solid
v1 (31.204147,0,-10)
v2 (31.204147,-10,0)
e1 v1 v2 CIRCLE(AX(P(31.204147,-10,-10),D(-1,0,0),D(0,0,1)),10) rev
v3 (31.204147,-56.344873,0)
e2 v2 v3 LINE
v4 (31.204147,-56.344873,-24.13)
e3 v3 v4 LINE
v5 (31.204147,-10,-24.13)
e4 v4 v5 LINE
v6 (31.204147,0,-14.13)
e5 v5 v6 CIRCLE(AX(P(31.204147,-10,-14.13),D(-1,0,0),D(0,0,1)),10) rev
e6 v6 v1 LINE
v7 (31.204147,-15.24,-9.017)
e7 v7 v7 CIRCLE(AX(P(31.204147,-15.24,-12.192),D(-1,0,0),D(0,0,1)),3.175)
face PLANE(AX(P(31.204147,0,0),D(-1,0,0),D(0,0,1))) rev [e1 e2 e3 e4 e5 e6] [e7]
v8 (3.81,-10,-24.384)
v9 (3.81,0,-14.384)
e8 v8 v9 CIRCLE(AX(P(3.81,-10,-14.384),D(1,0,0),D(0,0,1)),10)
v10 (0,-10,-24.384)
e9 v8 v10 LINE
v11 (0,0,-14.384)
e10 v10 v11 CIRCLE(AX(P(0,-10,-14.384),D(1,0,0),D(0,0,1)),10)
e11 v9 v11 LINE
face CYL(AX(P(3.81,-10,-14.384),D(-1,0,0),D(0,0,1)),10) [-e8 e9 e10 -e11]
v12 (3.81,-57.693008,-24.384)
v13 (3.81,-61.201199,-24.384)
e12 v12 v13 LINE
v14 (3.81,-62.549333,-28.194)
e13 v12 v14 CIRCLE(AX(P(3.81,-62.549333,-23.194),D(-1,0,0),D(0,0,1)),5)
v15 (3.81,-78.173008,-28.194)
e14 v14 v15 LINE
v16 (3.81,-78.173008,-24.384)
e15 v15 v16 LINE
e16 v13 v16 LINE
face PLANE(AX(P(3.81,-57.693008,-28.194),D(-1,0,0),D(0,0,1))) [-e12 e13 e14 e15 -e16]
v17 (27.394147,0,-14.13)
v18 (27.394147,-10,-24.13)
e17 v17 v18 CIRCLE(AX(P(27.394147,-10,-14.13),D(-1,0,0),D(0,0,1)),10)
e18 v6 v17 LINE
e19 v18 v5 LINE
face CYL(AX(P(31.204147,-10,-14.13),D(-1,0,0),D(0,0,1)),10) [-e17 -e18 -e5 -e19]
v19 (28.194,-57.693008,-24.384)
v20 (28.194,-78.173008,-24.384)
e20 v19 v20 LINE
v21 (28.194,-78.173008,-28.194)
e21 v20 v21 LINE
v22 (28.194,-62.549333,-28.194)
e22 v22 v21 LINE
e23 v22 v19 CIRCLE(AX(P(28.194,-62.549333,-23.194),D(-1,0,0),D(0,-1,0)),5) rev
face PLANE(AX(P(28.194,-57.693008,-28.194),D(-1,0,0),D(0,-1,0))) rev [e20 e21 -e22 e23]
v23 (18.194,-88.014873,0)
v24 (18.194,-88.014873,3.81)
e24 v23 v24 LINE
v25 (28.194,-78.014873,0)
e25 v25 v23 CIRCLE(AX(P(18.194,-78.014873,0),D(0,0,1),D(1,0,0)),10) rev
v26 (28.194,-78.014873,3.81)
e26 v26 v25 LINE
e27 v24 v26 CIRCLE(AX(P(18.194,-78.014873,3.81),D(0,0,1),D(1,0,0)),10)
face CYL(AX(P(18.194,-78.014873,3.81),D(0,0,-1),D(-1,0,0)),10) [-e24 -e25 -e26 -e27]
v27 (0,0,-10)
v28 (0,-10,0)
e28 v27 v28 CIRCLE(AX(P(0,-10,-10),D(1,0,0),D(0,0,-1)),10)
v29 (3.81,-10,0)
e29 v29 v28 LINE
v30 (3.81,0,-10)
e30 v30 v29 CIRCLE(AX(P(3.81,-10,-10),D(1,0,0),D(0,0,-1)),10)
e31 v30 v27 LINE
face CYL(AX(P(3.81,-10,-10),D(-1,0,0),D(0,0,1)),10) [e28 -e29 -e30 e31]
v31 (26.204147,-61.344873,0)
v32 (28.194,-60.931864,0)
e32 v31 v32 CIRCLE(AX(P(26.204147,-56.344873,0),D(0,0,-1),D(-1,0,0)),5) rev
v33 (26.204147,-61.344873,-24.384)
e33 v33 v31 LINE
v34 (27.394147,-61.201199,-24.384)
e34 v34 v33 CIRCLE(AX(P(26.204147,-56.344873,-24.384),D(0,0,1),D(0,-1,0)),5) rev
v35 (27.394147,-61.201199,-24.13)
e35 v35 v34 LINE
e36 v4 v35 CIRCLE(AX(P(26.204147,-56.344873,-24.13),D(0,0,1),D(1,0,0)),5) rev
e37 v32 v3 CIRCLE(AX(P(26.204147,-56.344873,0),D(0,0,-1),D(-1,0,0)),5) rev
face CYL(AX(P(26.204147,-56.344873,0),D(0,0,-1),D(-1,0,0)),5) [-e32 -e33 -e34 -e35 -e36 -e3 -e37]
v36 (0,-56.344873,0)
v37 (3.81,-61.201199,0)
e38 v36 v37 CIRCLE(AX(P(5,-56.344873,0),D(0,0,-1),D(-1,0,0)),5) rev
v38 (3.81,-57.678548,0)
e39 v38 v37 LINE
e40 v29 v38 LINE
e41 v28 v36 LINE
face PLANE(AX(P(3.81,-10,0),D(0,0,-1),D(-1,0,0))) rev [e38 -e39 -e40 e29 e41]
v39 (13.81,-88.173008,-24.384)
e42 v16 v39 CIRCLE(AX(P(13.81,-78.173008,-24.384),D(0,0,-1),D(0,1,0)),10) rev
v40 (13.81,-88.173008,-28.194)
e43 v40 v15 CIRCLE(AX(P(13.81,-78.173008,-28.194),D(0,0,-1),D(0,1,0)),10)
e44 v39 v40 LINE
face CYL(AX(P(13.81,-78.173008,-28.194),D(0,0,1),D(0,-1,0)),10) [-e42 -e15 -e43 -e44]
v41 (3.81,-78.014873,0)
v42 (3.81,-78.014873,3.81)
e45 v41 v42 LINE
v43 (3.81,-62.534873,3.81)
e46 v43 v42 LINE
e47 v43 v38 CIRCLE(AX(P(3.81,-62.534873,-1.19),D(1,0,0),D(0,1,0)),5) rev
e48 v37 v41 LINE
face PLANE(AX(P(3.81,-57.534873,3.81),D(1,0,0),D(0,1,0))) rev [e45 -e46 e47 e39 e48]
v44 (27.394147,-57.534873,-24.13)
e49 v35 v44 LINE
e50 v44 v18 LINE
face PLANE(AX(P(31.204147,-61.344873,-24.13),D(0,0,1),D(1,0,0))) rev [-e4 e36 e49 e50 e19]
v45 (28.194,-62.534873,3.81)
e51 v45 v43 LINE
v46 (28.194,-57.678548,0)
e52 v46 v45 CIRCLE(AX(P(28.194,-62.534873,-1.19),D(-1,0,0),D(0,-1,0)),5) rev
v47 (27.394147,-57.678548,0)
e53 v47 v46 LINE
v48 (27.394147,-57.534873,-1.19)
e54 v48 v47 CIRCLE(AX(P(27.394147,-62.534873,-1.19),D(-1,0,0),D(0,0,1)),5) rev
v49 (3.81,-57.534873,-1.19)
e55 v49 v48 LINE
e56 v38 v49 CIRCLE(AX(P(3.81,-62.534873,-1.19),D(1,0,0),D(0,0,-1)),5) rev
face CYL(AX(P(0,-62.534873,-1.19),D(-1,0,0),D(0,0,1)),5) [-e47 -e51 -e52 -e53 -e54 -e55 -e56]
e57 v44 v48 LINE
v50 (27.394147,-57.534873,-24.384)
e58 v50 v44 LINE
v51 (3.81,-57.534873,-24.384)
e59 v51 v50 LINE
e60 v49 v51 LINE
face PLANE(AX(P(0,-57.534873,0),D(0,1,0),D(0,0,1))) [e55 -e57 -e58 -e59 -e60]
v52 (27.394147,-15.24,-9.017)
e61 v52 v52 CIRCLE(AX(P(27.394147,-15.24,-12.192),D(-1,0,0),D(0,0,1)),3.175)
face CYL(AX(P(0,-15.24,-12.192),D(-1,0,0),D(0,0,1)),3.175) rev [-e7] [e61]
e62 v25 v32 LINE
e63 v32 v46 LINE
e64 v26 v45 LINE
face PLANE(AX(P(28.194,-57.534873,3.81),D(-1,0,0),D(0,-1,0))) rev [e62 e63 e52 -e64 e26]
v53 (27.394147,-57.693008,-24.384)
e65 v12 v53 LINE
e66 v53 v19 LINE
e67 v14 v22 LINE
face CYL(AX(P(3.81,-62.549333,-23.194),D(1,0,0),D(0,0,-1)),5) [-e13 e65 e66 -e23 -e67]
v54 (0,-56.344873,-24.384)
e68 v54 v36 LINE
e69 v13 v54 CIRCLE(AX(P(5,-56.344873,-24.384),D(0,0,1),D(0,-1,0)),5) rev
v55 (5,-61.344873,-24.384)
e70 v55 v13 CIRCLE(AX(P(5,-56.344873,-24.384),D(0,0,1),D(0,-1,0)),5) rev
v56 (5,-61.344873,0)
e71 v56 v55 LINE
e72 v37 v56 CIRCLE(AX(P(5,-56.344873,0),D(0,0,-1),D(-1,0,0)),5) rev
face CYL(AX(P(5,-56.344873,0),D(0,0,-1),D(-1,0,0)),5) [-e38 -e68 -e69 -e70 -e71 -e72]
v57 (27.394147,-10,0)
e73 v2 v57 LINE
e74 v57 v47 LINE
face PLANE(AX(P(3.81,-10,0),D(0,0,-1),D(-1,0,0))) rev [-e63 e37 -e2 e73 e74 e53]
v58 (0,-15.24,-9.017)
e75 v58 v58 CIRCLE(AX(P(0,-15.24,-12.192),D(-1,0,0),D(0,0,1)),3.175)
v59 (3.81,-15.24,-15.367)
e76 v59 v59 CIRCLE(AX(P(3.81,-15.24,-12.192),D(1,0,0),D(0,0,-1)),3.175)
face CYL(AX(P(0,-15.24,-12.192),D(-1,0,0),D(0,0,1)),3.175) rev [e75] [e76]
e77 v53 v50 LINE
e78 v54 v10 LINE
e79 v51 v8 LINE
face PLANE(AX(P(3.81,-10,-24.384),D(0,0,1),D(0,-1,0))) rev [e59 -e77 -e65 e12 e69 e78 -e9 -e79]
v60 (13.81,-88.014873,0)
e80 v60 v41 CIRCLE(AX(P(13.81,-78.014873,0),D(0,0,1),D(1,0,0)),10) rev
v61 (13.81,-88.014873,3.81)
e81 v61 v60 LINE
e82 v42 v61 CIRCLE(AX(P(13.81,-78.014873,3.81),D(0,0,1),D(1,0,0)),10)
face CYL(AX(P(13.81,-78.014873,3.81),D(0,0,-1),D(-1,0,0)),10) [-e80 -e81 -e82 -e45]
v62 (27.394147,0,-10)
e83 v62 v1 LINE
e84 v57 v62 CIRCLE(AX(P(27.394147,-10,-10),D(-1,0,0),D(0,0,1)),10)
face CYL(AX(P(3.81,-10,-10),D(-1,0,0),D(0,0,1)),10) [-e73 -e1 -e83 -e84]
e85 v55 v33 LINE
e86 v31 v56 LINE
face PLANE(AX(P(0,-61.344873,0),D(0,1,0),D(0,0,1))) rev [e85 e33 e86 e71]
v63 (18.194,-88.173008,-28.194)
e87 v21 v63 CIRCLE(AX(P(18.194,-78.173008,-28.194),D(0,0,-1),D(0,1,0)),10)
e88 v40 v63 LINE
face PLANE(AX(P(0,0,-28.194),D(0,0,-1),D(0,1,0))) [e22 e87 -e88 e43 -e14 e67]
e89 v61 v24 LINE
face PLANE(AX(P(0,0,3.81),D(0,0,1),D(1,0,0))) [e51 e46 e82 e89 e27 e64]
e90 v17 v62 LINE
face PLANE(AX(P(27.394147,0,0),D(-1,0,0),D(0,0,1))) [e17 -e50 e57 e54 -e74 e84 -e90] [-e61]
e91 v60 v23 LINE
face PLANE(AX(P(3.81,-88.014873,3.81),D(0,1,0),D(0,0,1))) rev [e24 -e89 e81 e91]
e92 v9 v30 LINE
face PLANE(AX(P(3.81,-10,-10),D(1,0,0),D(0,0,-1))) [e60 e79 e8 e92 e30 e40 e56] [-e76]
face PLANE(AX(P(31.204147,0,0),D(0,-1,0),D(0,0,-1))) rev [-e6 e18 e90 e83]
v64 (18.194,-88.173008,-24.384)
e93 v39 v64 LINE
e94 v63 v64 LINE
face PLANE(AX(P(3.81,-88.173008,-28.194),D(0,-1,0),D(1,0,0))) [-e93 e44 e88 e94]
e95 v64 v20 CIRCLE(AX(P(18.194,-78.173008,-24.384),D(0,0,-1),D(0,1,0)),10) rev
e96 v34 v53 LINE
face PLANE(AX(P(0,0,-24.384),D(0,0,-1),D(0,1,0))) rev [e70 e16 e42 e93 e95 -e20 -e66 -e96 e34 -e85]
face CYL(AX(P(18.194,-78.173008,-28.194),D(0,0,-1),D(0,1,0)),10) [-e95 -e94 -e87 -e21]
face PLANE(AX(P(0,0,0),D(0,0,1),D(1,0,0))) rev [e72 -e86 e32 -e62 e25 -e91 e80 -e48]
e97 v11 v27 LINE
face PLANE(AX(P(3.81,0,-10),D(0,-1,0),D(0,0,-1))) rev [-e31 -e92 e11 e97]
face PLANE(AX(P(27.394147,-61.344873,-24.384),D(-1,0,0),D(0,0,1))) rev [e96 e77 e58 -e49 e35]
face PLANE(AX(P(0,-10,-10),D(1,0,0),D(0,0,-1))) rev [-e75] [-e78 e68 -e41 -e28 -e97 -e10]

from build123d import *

# Parameters (mm, degrees)
BOSS_EXTRUDE1_DEPTH         = 3.81
SKETCH2_W                   = 27.394147034
SKETCH2_H                   = 24.384
BOSS_EXTRUDE2_DEPTH         = 3.81
SKETCH7_W                   = 24.13
SKETCH7_H                   = 61.344873393
BOSS_EXTRUDE3_DEPTH         = 3.81
FILLET1_R                   = 10
FILLET2_R                   = 10
FILLET3_R                   = 5
FILLET4_R                   = 5
SKETCH8_W                   = 24.384
SKETCH8_H                   = 30.48
BOSS_EXTRUDE4_DEPTH         = 3.81
FILLET5_R                   = 5
FILLET6_R                   = 10
FILLET8_R                   = 10
SKETCH9_W                   = 24.384
SKETCH9_H                   = 30.48
BOSS_EXTRUDE5_DEPTH         = 3.81
FILLET9_R                   = 10
FILLET10_R                  = 10
FILLET11_R                  = 5
F_1_4_0_25_DIAMETER_HOLE1_D = 6.35


with BuildPart() as part:
    # Sketch1 → Boss-Extrude1 (new body)
    with BuildSketch(Plane(origin=(0, 0, 0), x_dir=(0, 0, -1), z_dir=(1, 0, 0))):
        with BuildLine():
            Line((10, 0), (14.384, 0))
            ThreePointArc((14.384, 0), (21.455067812, -2.928932188), (24.384, -10))
            Line((24.384, -10), (24.384, -57.534873393))
            Line((24.384, -57.534873393), (0, -57.534873393))
            Line((0, -57.534873393), (0, -10))
            ThreePointArc((0, -10), (2.928932188, -2.928932188), (10, 0))
        make_face()
    extrude(amount=BOSS_EXTRUDE1_DEPTH)

    # Sketch2 → Boss-Extrude2 (add)
    with BuildSketch(Plane(origin=(0, -57.534873393, 0), x_dir=(-1, 0, 0), z_dir=(0, -1, 0))):
        with Locations((-13.697073517, 12.192)):
            Rectangle(SKETCH2_W, SKETCH2_H)
    extrude(amount=BOSS_EXTRUDE2_DEPTH)

    # Sketch7 → Boss-Extrude3 (add)
    with BuildSketch(Plane(origin=(27.394147034, 0, 0), x_dir=(0, 0, -1), z_dir=(1, 0, 0))):
        with Locations((12.065, -30.672436697)):
            Rectangle(SKETCH7_W, SKETCH7_H)
    extrude(amount=BOSS_EXTRUDE3_DEPTH)

    # Fillet1
    fillet1_edges = [part.edges().sort_by_distance(p)[0] for p in [
        (29.299147034, 0, -24.13),
    ]]
    fillet(fillet1_edges, radius=FILLET1_R)

    # Fillet2
    fillet2_edges = [part.edges().sort_by_distance(p)[0] for p in [
        (29.299147034, 0, 0),
    ]]
    fillet(fillet2_edges, radius=FILLET2_R)

    # Fillet3
    fillet3_edges = [part.edges().sort_by_distance(p)[0] for p in [
        (31.204147034, -61.344873393, -12.065),
    ]]
    fillet(fillet3_edges, radius=FILLET3_R)

    # Fillet4
    fillet4_edges = [part.edges().sort_by_distance(p)[0] for p in [
        (0, -61.344873393, -12.192),
    ]]
    fillet(fillet4_edges, radius=FILLET4_R)

    # Sketch8 → Boss-Extrude4 (add)
    with BuildSketch(Plane(origin=(0, 0, -24.384), x_dir=(-1, 0, 0), z_dir=(0, 0, -1))):
        with Locations((-16.002, -72.933007505)):
            Rectangle(SKETCH8_W, SKETCH8_H)
    extrude(amount=BOSS_EXTRUDE4_DEPTH)

    # Fillet5
    # the kernel refuses this fillet: 5 mm, written as the material it takes off along each edge
    with BuildSketch(Plane(origin=(-8.330814429, -57.693007505, -28.194), x_dir=(0, 0, 1), z_dir=(1, 0, 0))) as fillet5_piece_1:
        with BuildLine():
            CenterArc((5, 4.856325772), FILLET5_R, 180, 76.231471248)
            Line((0, 4.856325772), (-0.1, 4.856325772))
            Line((-0.1, 4.856325772), (-0.1, 0))
            Line((-0.1, 0), (0, -0.1))
            ThreePointArc((0, -0.1), (1.905, -0.1), (3.7862, -0.097126515))
            Line((3.7862, -0.097126515), (3.81, 0))
        make_face()
    extrude(amount=48.665628858, mode=Mode.SUBTRACT)

    # Fillet6
    fillet6_edges = [part.edges().sort_by_distance(p)[0] for p in [
        (3.81, -88.173007505, -26.289),
    ]]
    fillet(fillet6_edges, radius=FILLET6_R)

    # Fillet8
    fillet8_edges = [part.edges().sort_by_distance(p)[0] for p in [
        (28.194, -88.173007505, -26.289),
    ]]
    fillet(fillet8_edges, radius=FILLET8_R)

    # Sketch9 → Boss-Extrude5 (add)
    with BuildSketch(Plane.XY):
        with Locations((16.002, -72.774873393)):
            Rectangle(SKETCH9_W, SKETCH9_H)
    extrude(amount=BOSS_EXTRUDE5_DEPTH)

    # Fillet9
    fillet9_edges = [part.edges().sort_by_distance(p)[0] for p in [
        (3.81, -88.014873393, 1.905),
    ]]
    fillet(fillet9_edges, radius=FILLET9_R)

    # Fillet10
    fillet10_edges = [part.edges().sort_by_distance(p)[0] for p in [
        (28.194, -88.014873393, 1.905),
    ]]
    fillet(fillet10_edges, radius=FILLET10_R)

    # Fillet11
    # the kernel refuses this fillet: 5 mm, written as the material it takes off along each edge
    with BuildSketch(Plane(origin=(3.81, -57.534873393, 3.81), x_dir=(0, -1, 0), z_dir=(1, 0, 0))) as fillet11_piece_1_section:
        with BuildLine():
            CenterArc((FILLET11_R, FILLET11_R), FILLET11_R, 180, 90)
            Line((0, FILLET11_R), (0, 0))
            Line((0, 0), (FILLET11_R, 0))
        make_face()
    fillet11_piece_1 = extrude(amount=36.884, mode=Mode.PRIVATE)
    fillet11_piece_1 = split(fillet11_piece_1, bisect_by=Plane(origin=(27.394147034, -58.779272815, 2.781917075), z_dir=(-1, 0, 0)), keep=Keep.TOP, mode=Mode.PRIVATE)
    add(fillet11_piece_1, mode=Mode.SUBTRACT)
    with BuildSketch(Plane(origin=(-8.69, -57.534873393, 3.81), x_dir=(0, -1, 0), z_dir=(1, 0, 0))) as fillet11_piece_2_section:
        with BuildLine():
            CenterArc((FILLET11_R, FILLET11_R), FILLET11_R, 180, 90)
            Line((0, FILLET11_R), (0, 0))
            Line((0, 0), (FILLET11_R, 0))
        make_face()
    fillet11_piece_2 = extrude(amount=49.384, mode=Mode.PRIVATE)
    fillet11_piece_2 = split(fillet11_piece_2, bisect_by=Plane(origin=(27.831342884, -61.431899575, 0), z_dir=(0, 0, 1)), keep=Keep.TOP, mode=Mode.PRIVATE)
    add(fillet11_piece_2, mode=Mode.SUBTRACT)

    # 1/4 (0.25) Diameter Hole1 (through all)
    with Locations(Plane(origin=(0, -15.24, -12.192), x_dir=(0, 0, -1), z_dir=(-1, 0, 0))):
        with Locations((0, 0)):
            Hole(F_1_4_0_25_DIAMETER_HOLE1_D / 2)


solid = part.part
